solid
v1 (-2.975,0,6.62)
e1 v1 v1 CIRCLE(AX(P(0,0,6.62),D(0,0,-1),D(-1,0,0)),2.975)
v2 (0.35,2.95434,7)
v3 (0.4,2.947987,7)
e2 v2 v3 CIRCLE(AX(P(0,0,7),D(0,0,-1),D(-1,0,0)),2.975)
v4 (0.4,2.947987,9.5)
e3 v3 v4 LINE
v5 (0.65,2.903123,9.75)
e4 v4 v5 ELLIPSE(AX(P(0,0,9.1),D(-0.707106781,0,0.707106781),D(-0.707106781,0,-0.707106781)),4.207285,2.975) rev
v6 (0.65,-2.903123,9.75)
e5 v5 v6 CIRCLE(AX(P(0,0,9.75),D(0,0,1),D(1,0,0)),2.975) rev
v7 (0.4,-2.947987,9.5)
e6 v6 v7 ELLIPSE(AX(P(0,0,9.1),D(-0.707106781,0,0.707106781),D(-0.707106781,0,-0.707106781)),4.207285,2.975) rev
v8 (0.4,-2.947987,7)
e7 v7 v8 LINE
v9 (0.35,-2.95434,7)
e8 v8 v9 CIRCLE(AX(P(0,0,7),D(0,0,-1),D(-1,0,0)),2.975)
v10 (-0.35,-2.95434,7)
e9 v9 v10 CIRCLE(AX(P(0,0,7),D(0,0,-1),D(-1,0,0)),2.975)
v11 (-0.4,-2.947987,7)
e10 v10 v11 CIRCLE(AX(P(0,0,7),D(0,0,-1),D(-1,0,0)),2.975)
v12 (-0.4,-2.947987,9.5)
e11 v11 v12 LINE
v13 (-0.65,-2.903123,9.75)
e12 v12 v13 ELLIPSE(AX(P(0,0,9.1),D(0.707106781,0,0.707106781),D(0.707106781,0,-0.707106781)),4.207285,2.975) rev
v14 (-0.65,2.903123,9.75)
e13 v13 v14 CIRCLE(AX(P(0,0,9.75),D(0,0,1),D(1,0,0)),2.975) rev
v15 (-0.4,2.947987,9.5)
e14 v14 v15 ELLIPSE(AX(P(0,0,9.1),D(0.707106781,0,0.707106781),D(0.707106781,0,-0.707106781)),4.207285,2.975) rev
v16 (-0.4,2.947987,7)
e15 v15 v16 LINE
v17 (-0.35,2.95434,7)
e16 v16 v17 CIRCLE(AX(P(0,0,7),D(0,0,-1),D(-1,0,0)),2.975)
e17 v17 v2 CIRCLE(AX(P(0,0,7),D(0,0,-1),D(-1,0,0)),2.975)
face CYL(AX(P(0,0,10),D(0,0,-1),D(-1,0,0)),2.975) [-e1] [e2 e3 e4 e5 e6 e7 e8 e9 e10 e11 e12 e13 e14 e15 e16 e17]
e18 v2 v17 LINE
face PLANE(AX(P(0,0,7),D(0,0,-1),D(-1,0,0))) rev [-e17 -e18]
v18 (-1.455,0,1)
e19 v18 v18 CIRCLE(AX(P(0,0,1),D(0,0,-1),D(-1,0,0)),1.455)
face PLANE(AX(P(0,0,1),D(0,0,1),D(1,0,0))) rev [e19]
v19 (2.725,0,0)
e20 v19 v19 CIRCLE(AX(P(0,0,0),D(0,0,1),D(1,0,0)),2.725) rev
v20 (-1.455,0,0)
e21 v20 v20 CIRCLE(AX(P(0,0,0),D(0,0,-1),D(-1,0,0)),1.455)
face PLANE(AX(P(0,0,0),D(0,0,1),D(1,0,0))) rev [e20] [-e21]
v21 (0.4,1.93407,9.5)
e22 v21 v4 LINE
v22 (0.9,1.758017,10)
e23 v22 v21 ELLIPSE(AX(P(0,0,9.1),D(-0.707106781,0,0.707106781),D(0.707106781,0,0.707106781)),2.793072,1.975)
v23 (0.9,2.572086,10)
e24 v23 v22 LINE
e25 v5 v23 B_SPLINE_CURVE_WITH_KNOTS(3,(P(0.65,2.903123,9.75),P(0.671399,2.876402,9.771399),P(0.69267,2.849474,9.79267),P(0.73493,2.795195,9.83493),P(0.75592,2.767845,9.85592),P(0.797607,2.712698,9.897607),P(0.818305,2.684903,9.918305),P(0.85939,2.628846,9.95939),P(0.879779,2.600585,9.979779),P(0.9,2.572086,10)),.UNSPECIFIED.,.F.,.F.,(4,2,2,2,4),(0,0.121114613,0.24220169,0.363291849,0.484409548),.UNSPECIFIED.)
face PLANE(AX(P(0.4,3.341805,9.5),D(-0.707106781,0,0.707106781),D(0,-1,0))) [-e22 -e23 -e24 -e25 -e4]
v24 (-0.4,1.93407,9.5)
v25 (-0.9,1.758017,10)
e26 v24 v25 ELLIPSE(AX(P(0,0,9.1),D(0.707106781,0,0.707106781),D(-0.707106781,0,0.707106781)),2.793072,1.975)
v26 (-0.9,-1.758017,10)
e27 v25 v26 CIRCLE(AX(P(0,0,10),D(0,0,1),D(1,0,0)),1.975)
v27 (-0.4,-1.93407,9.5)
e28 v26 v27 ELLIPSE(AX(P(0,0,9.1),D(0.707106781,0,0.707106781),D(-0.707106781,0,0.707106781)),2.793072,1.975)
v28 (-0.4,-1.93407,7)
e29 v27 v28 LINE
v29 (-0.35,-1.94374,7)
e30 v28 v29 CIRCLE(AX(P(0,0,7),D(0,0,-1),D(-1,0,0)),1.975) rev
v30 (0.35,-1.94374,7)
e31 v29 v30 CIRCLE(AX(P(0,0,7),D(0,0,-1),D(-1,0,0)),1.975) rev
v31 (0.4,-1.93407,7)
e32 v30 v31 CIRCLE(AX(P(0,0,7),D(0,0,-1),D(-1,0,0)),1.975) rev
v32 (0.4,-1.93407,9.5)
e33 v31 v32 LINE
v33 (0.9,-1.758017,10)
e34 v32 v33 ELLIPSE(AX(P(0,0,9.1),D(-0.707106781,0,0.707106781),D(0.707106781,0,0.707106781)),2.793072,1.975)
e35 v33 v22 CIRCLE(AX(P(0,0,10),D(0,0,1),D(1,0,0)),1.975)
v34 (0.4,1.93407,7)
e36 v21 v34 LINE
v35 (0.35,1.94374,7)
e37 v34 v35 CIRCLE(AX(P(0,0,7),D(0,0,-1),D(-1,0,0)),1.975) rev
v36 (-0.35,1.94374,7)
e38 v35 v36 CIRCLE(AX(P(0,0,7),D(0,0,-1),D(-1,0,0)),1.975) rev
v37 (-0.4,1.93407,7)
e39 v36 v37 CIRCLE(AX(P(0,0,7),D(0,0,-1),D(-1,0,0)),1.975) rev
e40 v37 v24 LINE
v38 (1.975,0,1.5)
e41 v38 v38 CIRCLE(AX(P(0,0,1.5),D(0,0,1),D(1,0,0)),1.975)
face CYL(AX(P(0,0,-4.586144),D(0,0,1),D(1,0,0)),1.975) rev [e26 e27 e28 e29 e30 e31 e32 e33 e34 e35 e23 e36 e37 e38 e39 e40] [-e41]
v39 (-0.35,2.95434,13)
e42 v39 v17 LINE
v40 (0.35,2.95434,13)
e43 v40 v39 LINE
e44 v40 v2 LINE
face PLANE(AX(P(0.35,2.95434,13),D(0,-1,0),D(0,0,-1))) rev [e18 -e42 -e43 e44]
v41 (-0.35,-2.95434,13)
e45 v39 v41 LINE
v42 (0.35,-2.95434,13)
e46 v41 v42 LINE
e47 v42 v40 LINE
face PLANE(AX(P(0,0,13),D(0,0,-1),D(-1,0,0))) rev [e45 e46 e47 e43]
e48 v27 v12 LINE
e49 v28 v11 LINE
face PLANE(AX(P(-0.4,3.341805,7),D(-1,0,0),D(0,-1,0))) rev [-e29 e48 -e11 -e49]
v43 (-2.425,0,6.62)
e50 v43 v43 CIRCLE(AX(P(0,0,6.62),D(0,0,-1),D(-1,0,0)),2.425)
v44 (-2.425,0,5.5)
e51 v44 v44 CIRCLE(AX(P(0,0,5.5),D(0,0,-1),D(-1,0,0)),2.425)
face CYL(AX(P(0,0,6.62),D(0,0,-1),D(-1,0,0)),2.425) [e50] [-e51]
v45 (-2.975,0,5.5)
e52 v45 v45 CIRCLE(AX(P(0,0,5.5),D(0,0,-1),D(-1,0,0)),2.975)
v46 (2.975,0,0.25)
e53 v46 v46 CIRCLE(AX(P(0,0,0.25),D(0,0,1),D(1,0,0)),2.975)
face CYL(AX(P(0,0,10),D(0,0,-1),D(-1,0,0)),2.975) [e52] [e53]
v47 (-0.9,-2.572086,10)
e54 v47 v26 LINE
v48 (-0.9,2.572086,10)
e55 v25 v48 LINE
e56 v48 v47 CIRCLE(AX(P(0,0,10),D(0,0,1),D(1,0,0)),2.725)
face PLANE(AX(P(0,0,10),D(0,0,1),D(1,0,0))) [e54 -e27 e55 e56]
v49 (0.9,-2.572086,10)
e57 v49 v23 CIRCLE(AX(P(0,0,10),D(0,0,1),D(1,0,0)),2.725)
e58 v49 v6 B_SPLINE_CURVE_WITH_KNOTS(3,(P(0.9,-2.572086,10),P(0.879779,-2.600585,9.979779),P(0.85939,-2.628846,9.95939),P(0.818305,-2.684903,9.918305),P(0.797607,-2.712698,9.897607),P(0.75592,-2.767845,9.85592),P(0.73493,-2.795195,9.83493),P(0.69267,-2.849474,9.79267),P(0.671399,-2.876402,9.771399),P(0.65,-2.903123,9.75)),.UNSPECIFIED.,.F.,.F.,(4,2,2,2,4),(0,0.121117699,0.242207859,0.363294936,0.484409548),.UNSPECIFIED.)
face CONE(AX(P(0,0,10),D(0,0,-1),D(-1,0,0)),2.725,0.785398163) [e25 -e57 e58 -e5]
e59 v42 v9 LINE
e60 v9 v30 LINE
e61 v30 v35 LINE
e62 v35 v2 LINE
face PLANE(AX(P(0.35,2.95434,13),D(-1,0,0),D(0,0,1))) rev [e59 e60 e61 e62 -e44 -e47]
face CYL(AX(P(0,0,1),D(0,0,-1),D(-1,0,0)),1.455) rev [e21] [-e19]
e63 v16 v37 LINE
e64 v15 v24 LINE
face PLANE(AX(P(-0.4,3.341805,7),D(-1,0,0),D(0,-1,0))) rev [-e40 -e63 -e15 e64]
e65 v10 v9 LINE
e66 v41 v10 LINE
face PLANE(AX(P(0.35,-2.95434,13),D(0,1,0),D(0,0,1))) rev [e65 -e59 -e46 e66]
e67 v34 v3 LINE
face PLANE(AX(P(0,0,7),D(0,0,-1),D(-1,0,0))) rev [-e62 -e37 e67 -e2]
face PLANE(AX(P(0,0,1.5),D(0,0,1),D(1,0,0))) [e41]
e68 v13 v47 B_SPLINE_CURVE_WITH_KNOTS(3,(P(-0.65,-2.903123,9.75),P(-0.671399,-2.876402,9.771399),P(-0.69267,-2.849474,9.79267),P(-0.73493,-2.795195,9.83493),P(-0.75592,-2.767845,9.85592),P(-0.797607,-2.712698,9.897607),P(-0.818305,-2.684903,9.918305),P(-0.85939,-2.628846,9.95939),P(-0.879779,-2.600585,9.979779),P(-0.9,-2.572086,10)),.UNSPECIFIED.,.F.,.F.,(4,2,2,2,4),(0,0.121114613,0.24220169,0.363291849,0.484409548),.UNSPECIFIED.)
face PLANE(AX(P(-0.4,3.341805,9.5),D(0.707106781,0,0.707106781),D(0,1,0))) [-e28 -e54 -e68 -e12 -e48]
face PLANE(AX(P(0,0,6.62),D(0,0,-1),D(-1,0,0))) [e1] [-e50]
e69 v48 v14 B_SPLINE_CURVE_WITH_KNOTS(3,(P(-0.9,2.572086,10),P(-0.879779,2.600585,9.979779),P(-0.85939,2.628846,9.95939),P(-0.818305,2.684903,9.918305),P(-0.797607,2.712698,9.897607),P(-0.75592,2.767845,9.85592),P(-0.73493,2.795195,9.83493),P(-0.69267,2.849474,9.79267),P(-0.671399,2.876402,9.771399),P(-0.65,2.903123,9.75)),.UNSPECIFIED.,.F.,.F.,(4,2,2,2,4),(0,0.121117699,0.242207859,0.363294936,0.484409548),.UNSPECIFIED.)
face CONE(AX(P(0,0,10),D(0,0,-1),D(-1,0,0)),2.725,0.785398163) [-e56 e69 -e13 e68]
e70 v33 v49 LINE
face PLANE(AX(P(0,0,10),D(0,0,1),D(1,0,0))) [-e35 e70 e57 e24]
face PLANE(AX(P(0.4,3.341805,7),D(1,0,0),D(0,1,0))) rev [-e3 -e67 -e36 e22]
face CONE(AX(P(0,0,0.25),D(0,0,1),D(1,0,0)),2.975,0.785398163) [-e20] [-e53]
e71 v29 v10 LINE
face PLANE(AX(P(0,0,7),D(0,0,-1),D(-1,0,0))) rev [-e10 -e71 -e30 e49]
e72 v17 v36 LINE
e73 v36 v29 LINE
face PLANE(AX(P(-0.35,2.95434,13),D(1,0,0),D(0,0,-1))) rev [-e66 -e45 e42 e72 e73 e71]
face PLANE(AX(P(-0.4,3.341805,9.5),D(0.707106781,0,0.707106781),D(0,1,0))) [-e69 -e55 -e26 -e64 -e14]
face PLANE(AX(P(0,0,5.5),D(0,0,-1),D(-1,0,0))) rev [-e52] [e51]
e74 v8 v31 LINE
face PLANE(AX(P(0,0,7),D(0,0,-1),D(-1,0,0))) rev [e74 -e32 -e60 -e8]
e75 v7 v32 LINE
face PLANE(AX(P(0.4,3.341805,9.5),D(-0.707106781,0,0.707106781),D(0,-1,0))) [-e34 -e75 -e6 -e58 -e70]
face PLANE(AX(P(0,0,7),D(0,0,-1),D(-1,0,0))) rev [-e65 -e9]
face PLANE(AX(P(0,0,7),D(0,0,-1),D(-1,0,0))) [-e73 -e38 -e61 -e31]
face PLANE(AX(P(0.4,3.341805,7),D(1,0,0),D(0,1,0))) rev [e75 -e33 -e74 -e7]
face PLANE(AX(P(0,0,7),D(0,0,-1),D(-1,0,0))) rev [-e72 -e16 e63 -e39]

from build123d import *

# Parameters (mm, degrees)
ESBO_O1_R                = 2.975
RESSALTO_EXTRUS_O1_DEPTH = 10
ESBO_O2_R                = 4.073112834
ESBO_O2_R_2              = 2.425
CORTE_EXTRUS_O1_DEPTH    = 1.12
ESBO_O3_R                = 1.455
CORTE_EXTRUS_O2_DEPTH    = 1
ESBO_O4_R                = 1.975
CORTE_EXTRUS_O3_DEPTH    = 9
RESSALTO_EXTRUS_O2_START = 0.5
ESBO_O5_R                = 1.975
RESSALTO_EXTRUS_O2_DEPTH = 0.5
CHANFRO1_SIZE            = 0.25
ESBO_O6_W                = 0.8
ESBO_O6_H                = 6.683609012
CORTE_EXTRUS_O4_DEPTH    = 3
CHANFRO2_SIZE            = 0.5
ESBO_O7_W                = 0.7
ESBO_O7_H                = 5.908680056
RESSALTO_EXTRUS_O3_DEPTH = 6


with BuildPart() as part:
    # Esboço1 → Ressalto-extrusão1 (new body)
    with BuildSketch(Plane.XY):
        Circle(ESBO_O1_R)
    extrude(amount=RESSALTO_EXTRUS_O1_DEPTH)

    # Esboço2 → Corte-extrusão1 (cut)
    with BuildSketch(Plane(origin=(0, 0, 5.5), x_dir=(-1, 0, 0), z_dir=(0, 0, -1))):
        Circle(ESBO_O2_R)
        Circle(ESBO_O2_R_2, mode=Mode.SUBTRACT)
    extrude(amount=-CORTE_EXTRUS_O1_DEPTH, mode=Mode.SUBTRACT)

    # Esboço3 → Corte-extrusão2 (cut)
    with BuildSketch(Plane(origin=(0, 0, 0), x_dir=(-1, 0, 0), z_dir=(0, 0, -1))):
        Circle(ESBO_O3_R)
    extrude(amount=-CORTE_EXTRUS_O2_DEPTH, mode=Mode.SUBTRACT)

    # Esboço4 → Corte-extrusão3 (cut)
    with BuildSketch(Plane.XY.offset(10)):
        Circle(ESBO_O4_R)
    extrude(amount=-CORTE_EXTRUS_O3_DEPTH, mode=Mode.SUBTRACT)

    # Esboço5 → Ressalto-extrusão2 (add)
    with BuildSketch(Plane.XY.offset(1).offset(RESSALTO_EXTRUS_O2_START)):
        Circle(ESBO_O5_R)
    extrude(amount=-RESSALTO_EXTRUS_O2_DEPTH)

    # Chanfro1
    chanfro1_edges = [part.edges().sort_by_distance(p)[0] for p in [
        (-2.975, 0, 0),
        (-2.975, 0, 10),
    ]]
    chamfer(chanfro1_edges, length=CHANFRO1_SIZE)

    # Esboço6 → Corte-extrusão4 (cut)
    with BuildSketch(Plane.XY.offset(10)):
        Rectangle(ESBO_O6_W, ESBO_O6_H)
    extrude(amount=-CORTE_EXTRUS_O4_DEPTH, mode=Mode.SUBTRACT)

    # Chanfro2
    # the kernel refuses this chamfer: 0.5 mm, written as the material it takes off along each edge
    with BuildSketch(Plane(origin=(0.4, 0.64822805, 10), x_dir=(-0.027495876610586403, 0, -0.9996219169112968), z_dir=(0, 1, 0))) as chanfro2_piece_1:
        Polygon((CHANFRO2_SIZE * 0.999621916911, -CHANFRO2_SIZE * 0.0274958766106), (-CHANFRO2_SIZE * 0.0274958766106, -CHANFRO2_SIZE * 0.999621916911), (0, 0), align=None)
    extrude(amount=3.333095776, mode=Mode.SUBTRACT)
    with BuildSketch(Plane(origin=(0.4, -3.981323826, 10), x_dir=(0.9996219169112968, 0, 0.027495876610585633), z_dir=(0, 1, 0)), Plane(origin=(-0.4, -0.64822805, 10), x_dir=(-0.9996219169112968, 0, 0.027495876610585623), z_dir=(0, -1, 0)), Plane(origin=(-0.4, 3.981323826, 10), x_dir=(-0.9996219169112968, 0, 0.027495876610585623), z_dir=(0, -1, 0))) as chanfro2_piece_2:
        Polygon((CHANFRO2_SIZE * 0.999621916911, CHANFRO2_SIZE * 0.0274958766106), (-CHANFRO2_SIZE * 0.0274958766106, CHANFRO2_SIZE * 0.999621916911), (0, 0), align=None)
    extrude(amount=3.333095776, mode=Mode.SUBTRACT)

    # Esboço7 → Ressalto-extrusão3 (add)
    with BuildSketch(Plane.XY.offset(7)):
        Rectangle(ESBO_O7_W, ESBO_O7_H)
    extrude(amount=RESSALTO_EXTRUS_O3_DEPTH)


solid = part.part
